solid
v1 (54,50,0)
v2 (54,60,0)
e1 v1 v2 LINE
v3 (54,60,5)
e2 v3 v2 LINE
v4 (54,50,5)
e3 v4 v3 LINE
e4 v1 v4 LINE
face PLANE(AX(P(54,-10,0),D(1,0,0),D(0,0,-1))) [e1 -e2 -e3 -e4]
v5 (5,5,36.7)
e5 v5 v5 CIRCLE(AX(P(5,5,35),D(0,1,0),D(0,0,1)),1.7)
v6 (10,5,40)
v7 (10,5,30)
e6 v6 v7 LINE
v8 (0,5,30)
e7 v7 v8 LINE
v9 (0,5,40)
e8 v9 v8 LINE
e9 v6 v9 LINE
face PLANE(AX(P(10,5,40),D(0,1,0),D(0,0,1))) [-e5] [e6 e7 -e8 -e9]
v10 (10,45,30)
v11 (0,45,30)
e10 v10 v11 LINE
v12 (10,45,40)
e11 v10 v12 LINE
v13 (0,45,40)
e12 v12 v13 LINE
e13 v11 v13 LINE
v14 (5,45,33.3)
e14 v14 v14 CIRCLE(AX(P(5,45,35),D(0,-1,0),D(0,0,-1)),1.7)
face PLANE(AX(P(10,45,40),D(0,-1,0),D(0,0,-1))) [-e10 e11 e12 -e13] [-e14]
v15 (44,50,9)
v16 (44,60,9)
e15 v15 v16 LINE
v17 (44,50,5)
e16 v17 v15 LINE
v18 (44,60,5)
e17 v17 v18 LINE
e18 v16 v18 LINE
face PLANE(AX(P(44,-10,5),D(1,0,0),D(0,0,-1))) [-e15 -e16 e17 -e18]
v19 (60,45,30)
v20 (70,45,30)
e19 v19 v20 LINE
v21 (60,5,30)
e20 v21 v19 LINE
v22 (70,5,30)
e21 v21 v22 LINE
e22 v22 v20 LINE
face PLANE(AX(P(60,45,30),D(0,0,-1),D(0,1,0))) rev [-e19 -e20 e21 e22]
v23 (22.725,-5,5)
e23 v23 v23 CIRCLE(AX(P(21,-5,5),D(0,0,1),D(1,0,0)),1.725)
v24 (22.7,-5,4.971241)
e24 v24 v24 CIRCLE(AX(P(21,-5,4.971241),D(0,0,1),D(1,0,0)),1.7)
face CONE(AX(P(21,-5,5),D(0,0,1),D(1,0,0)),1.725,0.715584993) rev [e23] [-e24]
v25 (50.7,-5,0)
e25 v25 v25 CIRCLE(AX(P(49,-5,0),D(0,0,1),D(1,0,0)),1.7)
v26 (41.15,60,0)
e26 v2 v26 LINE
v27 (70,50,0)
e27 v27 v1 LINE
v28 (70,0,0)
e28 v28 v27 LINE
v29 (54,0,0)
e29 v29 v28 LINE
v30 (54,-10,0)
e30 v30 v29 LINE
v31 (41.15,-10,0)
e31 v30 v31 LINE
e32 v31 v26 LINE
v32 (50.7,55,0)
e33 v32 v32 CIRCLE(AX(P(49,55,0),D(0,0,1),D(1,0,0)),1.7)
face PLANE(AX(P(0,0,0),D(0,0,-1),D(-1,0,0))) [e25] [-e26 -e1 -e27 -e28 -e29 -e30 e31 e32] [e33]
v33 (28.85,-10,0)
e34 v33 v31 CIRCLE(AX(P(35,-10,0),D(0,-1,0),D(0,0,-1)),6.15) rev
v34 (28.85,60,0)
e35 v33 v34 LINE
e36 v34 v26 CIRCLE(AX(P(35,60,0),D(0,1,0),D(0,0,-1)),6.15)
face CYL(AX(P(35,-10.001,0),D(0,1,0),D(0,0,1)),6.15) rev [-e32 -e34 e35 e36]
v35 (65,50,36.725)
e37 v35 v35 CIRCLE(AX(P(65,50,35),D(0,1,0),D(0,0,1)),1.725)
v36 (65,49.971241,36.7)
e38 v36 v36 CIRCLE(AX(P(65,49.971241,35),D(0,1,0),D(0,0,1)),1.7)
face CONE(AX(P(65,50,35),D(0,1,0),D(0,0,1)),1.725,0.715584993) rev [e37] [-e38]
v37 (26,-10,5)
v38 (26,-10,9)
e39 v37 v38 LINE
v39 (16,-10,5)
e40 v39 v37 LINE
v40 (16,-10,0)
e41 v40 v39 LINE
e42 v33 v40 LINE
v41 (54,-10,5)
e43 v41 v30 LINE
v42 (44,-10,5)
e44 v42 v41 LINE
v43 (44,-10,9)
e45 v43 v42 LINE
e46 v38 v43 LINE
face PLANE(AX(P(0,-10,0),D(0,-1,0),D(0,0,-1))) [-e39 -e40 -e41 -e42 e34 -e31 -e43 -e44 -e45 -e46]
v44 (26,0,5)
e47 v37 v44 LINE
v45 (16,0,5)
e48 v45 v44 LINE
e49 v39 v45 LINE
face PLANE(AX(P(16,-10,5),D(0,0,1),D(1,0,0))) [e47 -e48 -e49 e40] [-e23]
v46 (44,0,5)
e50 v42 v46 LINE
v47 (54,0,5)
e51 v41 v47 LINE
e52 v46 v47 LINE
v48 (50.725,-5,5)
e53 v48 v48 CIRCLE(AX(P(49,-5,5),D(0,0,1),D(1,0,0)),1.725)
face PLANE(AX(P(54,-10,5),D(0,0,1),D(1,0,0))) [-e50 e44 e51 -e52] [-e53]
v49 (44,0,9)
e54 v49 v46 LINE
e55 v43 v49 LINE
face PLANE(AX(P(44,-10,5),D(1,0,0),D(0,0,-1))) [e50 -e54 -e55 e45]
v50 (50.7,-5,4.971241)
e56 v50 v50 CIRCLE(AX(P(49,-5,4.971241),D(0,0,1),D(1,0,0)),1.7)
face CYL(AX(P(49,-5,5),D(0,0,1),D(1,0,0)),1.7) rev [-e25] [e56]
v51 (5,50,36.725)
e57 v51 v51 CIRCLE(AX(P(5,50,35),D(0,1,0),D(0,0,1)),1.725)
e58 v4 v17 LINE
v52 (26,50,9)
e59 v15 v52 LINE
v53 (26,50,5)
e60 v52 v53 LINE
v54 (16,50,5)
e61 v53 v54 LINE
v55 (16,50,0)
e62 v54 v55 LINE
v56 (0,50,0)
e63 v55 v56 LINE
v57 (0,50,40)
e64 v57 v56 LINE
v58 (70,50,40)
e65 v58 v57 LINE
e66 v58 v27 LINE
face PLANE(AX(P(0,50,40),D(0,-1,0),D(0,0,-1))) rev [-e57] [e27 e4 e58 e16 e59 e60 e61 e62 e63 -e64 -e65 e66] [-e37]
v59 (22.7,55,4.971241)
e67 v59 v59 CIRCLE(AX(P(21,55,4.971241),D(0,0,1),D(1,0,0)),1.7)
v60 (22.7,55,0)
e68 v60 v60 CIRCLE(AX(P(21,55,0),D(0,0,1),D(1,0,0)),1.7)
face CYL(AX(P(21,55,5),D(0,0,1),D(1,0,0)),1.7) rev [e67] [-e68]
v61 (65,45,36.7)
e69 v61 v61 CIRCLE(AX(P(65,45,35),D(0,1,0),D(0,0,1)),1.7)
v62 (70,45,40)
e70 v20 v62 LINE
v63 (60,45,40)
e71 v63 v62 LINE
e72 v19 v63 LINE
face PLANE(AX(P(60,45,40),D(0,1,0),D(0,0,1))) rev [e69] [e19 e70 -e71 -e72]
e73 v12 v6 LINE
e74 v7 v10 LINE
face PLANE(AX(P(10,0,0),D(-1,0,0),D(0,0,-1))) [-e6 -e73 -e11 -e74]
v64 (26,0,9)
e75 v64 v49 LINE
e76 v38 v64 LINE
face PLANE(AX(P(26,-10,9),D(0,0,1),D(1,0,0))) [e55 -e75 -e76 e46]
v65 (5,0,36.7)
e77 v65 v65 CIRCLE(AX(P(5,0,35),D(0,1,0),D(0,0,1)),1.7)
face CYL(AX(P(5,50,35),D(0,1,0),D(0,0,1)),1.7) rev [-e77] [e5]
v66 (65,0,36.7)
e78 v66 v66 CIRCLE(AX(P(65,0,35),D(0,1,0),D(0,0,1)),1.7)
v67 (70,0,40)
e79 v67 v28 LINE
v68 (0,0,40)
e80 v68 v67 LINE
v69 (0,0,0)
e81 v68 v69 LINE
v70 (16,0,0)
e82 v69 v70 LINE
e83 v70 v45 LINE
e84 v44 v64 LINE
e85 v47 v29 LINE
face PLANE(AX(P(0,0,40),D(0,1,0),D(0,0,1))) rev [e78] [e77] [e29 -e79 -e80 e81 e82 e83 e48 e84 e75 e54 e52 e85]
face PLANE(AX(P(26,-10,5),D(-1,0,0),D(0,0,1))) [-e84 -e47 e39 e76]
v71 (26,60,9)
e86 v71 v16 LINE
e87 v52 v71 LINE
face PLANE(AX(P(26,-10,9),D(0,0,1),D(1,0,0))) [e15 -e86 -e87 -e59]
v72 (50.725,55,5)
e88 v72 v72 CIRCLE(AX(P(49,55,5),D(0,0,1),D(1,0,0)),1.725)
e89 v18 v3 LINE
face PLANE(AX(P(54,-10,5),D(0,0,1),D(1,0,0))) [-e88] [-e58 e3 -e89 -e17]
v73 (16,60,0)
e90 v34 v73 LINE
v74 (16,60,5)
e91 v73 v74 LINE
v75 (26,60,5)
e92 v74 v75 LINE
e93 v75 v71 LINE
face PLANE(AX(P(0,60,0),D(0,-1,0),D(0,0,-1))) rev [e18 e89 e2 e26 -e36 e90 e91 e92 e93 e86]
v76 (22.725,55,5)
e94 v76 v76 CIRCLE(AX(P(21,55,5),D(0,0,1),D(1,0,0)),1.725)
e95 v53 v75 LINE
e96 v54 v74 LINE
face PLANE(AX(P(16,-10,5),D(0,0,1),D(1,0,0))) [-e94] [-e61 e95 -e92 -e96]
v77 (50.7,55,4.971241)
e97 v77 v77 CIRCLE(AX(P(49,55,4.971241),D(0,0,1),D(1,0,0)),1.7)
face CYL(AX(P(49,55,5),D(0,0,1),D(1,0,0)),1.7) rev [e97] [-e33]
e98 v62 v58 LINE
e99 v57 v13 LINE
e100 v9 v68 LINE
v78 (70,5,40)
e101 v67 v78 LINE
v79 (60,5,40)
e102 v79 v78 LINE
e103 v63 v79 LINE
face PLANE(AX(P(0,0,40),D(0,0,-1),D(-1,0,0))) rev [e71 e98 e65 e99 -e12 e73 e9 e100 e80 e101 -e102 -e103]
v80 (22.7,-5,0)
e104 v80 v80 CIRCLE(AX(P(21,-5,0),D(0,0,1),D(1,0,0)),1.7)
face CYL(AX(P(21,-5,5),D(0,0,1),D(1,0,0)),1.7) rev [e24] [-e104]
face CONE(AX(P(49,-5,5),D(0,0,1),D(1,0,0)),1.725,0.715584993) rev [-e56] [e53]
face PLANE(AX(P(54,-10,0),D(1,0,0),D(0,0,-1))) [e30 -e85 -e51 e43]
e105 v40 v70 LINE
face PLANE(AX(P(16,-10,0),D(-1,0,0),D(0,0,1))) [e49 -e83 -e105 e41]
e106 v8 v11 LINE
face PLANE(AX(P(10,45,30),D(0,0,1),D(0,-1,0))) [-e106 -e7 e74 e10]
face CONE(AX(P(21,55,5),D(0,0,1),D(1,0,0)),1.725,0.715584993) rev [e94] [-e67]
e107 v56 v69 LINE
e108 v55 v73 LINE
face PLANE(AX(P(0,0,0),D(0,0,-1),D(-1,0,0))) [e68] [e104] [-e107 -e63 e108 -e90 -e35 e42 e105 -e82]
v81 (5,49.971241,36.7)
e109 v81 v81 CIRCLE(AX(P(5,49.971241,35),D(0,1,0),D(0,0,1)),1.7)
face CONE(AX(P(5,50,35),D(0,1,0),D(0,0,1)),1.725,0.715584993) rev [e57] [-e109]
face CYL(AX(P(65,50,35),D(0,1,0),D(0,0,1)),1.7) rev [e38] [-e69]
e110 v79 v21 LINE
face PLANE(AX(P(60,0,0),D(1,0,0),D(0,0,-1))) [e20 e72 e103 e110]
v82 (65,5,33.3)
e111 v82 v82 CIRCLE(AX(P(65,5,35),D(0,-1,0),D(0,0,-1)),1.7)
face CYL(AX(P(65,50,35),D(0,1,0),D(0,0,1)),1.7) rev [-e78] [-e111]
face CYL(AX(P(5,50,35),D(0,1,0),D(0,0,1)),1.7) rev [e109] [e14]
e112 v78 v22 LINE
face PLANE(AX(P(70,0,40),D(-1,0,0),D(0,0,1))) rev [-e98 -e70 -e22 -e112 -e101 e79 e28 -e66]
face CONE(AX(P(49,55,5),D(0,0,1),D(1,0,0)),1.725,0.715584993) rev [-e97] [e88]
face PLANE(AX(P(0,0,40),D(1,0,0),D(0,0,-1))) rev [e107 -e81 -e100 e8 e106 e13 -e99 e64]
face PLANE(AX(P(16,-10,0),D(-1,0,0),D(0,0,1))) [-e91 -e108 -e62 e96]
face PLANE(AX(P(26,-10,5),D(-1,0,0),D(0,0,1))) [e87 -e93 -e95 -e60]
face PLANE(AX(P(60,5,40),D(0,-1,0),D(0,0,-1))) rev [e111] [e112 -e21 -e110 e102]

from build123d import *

# Parameters (mm, degrees)
SKETCH_1_W                 = 70
SKETCH_1_H                 = 50
EXTRUDE_1_DEPTH            = 40
EXTRUDE_2_DEPTH            = 10
EXTRUDE_2_DEPTH_BACK       = 60
CUT_EXTRUDE_1_REACH        = 108.771
SKETCH_7_W                 = 10
SKETCH_7_H                 = 40
CUT_EXTRUDE_2_DEPTH        = 10
HOLE_WIZARD_M3_2_OUTLINE_R = 1.7
HOLE_WIZARD_M3_2_DEPTH     = 5


# Read off the part's stored shape, not the designer's step: M3 すきま穴1, M3 すきま穴2
with BuildPart() as part:
    # ｽｹｯﾁ1 → ﾎﾞｽ - 押し出し1 (new body)
    with BuildSketch(Plane.XY):
        with Locations((35, 25)):
            Rectangle(SKETCH_1_W, SKETCH_1_H)
    extrude(amount=EXTRUDE_1_DEPTH)

    # ｽｹｯﾁ2 → ﾎﾞｽ - 押し出し2 (add, two sides: drawn at the far end of the back side and taken through both)
    with BuildSketch(Plane(origin=(0, 50, 0), x_dir=(1, 0, 0), z_dir=(0, 1, 0)).offset(-EXTRUDE_2_DEPTH_BACK)):
        Polygon((16, 0), (16, -5), (26, -5), (26, -9), (44, -9), (44, -5), (54, -5), (54, 0), align=None)
    extrude(amount=EXTRUDE_2_DEPTH + EXTRUDE_2_DEPTH_BACK)

    # M3 すきま穴1 outline → M3 すきま穴1 (revolve, cut)
    with BuildSketch(Plane(origin=(49, -5, 0), x_dir=(1, 0, 0), z_dir=(0, -1, 0))):
        Polygon((0, 0), (1.7, 0), (1.7, 4.97124079), (1.725, 5), (0, 5), align=None)
    revolve(axis=Axis((49, -5, 0), (0, 0, 1)), mode=Mode.SUBTRACT)

    # Hole Wizard M3 _1 2 outline → Hole Wizard M3 _1 2 (revolve, cut)
    with BuildSketch(Plane(origin=(21, -5, 0), x_dir=(1, 0, 0), z_dir=(0, -1, 0))):
        Polygon((0, 0), (1.7, 0), (1.7, 4.97124079), (1.725, 5), (0, 5), align=None)
    revolve(axis=Axis((21, -5, 0), (0, 0, 1)), mode=Mode.SUBTRACT)

    # Hole Wizard M3 _1 3 outline → Hole Wizard M3 _1 3 (revolve, cut)
    with BuildSketch(Plane(origin=(49, 55, 0), x_dir=(1, 0, 0), z_dir=(0, -1, 0))):
        Polygon((0, 0), (1.7, 0), (1.7, 4.97124079), (1.725, 5), (0, 5), align=None)
    revolve(axis=Axis((49, 55, 0), (0, 0, 1)), mode=Mode.SUBTRACT)

    # Hole Wizard M3 _1 4 outline → Hole Wizard M3 _1 4 (revolve, cut)
    with BuildSketch(Plane(origin=(21, 55, 0), x_dir=(1, 0, 0), z_dir=(0, -1, 0))):
        Polygon((0, 0), (1.7, 0), (1.7, 4.97124079), (1.725, 5), (0, 5), align=None)
    revolve(axis=Axis((21, 55, 0), (0, 0, 1)), mode=Mode.SUBTRACT)

    # ｽｹｯﾁ6 → ｶｯﾄ - 押し出し1 (cut, up to next)
    with BuildSketch(Plane(origin=(0, 60, 0), x_dir=(1, 0, 0), z_dir=(0, 1, 0)), mode=Mode.PRIVATE) as cut_extrude_1_sk1:
        with BuildLine():
            Line((28.85, 0), (41.15, 0))
            ThreePointArc((41.15, 0), (35, -6.15), (28.85, 0))
        make_face()
    cut_extrude_1_tool1 = extrude(cut_extrude_1_sk1.sketch, amount=-CUT_EXTRUDE_1_REACH, mode=Mode.PRIVATE) & part.part
    add(cut_extrude_1_tool1.solids().sort_by_distance((35, 60, 2.610141))[0], mode=Mode.SUBTRACT)

    # ｽｹｯﾁ7 → ｶｯﾄ - 押し出し2 (cut)
    with BuildSketch(Plane(origin=(70, 0, 0), x_dir=(0, 0, -1), z_dir=(1, 0, 0))):
        with Locations((-35, 25)):
            Rectangle(SKETCH_7_W, SKETCH_7_H)
    cut_extrude_2 = extrude(amount=-CUT_EXTRUDE_2_DEPTH, mode=Mode.SUBTRACT)

    # ﾐﾗｰ1: ｶｯﾄ - 押し出し2 across plane
    add(cut_extrude_2.mirror(Plane.ZY.offset(-35)), mode=Mode.SUBTRACT)

    # M3 すきま穴2 outline → M3 すきま穴2 (cut)
    with BuildSketch(Plane(origin=(0, 0, 0), x_dir=(1, 0, 0), z_dir=(0, 1, 0))):
        with Locations((65, -35)):
            Circle(HOLE_WIZARD_M3_2_OUTLINE_R)
        with Locations((5, -35)):
            Circle(HOLE_WIZARD_M3_2_OUTLINE_R)
    extrude(amount=HOLE_WIZARD_M3_2_DEPTH, mode=Mode.SUBTRACT)

    # Hole Wizard M3 _2 2 outline → Hole Wizard M3 _2 2 (revolve, cut)
    with BuildSketch(Plane(origin=(65, 0, 35), x_dir=(1, 0, 0), z_dir=(0, 0, 1))):
        Polygon((1.725, 50), (0, 50), (0, 45), (1.7, 45), (1.7, 49.97124079), align=None)
    revolve(axis=Axis((65, 0, 35), (0, 1, 0)), mode=Mode.SUBTRACT)

    # Hole Wizard M3 _2 3 outline → Hole Wizard M3 _2 3 (revolve, cut)
    with BuildSketch(Plane(origin=(5, 0, 35), x_dir=(1, 0, 0), z_dir=(0, 0, 1))):
        Polygon((0, 45), (1.7, 45), (1.7, 49.97124079), (1.725, 50), (0, 50), align=None)
    revolve(axis=Axis((5, 0, 35), (0, 1, 0)), mode=Mode.SUBTRACT)


solid = part.part
